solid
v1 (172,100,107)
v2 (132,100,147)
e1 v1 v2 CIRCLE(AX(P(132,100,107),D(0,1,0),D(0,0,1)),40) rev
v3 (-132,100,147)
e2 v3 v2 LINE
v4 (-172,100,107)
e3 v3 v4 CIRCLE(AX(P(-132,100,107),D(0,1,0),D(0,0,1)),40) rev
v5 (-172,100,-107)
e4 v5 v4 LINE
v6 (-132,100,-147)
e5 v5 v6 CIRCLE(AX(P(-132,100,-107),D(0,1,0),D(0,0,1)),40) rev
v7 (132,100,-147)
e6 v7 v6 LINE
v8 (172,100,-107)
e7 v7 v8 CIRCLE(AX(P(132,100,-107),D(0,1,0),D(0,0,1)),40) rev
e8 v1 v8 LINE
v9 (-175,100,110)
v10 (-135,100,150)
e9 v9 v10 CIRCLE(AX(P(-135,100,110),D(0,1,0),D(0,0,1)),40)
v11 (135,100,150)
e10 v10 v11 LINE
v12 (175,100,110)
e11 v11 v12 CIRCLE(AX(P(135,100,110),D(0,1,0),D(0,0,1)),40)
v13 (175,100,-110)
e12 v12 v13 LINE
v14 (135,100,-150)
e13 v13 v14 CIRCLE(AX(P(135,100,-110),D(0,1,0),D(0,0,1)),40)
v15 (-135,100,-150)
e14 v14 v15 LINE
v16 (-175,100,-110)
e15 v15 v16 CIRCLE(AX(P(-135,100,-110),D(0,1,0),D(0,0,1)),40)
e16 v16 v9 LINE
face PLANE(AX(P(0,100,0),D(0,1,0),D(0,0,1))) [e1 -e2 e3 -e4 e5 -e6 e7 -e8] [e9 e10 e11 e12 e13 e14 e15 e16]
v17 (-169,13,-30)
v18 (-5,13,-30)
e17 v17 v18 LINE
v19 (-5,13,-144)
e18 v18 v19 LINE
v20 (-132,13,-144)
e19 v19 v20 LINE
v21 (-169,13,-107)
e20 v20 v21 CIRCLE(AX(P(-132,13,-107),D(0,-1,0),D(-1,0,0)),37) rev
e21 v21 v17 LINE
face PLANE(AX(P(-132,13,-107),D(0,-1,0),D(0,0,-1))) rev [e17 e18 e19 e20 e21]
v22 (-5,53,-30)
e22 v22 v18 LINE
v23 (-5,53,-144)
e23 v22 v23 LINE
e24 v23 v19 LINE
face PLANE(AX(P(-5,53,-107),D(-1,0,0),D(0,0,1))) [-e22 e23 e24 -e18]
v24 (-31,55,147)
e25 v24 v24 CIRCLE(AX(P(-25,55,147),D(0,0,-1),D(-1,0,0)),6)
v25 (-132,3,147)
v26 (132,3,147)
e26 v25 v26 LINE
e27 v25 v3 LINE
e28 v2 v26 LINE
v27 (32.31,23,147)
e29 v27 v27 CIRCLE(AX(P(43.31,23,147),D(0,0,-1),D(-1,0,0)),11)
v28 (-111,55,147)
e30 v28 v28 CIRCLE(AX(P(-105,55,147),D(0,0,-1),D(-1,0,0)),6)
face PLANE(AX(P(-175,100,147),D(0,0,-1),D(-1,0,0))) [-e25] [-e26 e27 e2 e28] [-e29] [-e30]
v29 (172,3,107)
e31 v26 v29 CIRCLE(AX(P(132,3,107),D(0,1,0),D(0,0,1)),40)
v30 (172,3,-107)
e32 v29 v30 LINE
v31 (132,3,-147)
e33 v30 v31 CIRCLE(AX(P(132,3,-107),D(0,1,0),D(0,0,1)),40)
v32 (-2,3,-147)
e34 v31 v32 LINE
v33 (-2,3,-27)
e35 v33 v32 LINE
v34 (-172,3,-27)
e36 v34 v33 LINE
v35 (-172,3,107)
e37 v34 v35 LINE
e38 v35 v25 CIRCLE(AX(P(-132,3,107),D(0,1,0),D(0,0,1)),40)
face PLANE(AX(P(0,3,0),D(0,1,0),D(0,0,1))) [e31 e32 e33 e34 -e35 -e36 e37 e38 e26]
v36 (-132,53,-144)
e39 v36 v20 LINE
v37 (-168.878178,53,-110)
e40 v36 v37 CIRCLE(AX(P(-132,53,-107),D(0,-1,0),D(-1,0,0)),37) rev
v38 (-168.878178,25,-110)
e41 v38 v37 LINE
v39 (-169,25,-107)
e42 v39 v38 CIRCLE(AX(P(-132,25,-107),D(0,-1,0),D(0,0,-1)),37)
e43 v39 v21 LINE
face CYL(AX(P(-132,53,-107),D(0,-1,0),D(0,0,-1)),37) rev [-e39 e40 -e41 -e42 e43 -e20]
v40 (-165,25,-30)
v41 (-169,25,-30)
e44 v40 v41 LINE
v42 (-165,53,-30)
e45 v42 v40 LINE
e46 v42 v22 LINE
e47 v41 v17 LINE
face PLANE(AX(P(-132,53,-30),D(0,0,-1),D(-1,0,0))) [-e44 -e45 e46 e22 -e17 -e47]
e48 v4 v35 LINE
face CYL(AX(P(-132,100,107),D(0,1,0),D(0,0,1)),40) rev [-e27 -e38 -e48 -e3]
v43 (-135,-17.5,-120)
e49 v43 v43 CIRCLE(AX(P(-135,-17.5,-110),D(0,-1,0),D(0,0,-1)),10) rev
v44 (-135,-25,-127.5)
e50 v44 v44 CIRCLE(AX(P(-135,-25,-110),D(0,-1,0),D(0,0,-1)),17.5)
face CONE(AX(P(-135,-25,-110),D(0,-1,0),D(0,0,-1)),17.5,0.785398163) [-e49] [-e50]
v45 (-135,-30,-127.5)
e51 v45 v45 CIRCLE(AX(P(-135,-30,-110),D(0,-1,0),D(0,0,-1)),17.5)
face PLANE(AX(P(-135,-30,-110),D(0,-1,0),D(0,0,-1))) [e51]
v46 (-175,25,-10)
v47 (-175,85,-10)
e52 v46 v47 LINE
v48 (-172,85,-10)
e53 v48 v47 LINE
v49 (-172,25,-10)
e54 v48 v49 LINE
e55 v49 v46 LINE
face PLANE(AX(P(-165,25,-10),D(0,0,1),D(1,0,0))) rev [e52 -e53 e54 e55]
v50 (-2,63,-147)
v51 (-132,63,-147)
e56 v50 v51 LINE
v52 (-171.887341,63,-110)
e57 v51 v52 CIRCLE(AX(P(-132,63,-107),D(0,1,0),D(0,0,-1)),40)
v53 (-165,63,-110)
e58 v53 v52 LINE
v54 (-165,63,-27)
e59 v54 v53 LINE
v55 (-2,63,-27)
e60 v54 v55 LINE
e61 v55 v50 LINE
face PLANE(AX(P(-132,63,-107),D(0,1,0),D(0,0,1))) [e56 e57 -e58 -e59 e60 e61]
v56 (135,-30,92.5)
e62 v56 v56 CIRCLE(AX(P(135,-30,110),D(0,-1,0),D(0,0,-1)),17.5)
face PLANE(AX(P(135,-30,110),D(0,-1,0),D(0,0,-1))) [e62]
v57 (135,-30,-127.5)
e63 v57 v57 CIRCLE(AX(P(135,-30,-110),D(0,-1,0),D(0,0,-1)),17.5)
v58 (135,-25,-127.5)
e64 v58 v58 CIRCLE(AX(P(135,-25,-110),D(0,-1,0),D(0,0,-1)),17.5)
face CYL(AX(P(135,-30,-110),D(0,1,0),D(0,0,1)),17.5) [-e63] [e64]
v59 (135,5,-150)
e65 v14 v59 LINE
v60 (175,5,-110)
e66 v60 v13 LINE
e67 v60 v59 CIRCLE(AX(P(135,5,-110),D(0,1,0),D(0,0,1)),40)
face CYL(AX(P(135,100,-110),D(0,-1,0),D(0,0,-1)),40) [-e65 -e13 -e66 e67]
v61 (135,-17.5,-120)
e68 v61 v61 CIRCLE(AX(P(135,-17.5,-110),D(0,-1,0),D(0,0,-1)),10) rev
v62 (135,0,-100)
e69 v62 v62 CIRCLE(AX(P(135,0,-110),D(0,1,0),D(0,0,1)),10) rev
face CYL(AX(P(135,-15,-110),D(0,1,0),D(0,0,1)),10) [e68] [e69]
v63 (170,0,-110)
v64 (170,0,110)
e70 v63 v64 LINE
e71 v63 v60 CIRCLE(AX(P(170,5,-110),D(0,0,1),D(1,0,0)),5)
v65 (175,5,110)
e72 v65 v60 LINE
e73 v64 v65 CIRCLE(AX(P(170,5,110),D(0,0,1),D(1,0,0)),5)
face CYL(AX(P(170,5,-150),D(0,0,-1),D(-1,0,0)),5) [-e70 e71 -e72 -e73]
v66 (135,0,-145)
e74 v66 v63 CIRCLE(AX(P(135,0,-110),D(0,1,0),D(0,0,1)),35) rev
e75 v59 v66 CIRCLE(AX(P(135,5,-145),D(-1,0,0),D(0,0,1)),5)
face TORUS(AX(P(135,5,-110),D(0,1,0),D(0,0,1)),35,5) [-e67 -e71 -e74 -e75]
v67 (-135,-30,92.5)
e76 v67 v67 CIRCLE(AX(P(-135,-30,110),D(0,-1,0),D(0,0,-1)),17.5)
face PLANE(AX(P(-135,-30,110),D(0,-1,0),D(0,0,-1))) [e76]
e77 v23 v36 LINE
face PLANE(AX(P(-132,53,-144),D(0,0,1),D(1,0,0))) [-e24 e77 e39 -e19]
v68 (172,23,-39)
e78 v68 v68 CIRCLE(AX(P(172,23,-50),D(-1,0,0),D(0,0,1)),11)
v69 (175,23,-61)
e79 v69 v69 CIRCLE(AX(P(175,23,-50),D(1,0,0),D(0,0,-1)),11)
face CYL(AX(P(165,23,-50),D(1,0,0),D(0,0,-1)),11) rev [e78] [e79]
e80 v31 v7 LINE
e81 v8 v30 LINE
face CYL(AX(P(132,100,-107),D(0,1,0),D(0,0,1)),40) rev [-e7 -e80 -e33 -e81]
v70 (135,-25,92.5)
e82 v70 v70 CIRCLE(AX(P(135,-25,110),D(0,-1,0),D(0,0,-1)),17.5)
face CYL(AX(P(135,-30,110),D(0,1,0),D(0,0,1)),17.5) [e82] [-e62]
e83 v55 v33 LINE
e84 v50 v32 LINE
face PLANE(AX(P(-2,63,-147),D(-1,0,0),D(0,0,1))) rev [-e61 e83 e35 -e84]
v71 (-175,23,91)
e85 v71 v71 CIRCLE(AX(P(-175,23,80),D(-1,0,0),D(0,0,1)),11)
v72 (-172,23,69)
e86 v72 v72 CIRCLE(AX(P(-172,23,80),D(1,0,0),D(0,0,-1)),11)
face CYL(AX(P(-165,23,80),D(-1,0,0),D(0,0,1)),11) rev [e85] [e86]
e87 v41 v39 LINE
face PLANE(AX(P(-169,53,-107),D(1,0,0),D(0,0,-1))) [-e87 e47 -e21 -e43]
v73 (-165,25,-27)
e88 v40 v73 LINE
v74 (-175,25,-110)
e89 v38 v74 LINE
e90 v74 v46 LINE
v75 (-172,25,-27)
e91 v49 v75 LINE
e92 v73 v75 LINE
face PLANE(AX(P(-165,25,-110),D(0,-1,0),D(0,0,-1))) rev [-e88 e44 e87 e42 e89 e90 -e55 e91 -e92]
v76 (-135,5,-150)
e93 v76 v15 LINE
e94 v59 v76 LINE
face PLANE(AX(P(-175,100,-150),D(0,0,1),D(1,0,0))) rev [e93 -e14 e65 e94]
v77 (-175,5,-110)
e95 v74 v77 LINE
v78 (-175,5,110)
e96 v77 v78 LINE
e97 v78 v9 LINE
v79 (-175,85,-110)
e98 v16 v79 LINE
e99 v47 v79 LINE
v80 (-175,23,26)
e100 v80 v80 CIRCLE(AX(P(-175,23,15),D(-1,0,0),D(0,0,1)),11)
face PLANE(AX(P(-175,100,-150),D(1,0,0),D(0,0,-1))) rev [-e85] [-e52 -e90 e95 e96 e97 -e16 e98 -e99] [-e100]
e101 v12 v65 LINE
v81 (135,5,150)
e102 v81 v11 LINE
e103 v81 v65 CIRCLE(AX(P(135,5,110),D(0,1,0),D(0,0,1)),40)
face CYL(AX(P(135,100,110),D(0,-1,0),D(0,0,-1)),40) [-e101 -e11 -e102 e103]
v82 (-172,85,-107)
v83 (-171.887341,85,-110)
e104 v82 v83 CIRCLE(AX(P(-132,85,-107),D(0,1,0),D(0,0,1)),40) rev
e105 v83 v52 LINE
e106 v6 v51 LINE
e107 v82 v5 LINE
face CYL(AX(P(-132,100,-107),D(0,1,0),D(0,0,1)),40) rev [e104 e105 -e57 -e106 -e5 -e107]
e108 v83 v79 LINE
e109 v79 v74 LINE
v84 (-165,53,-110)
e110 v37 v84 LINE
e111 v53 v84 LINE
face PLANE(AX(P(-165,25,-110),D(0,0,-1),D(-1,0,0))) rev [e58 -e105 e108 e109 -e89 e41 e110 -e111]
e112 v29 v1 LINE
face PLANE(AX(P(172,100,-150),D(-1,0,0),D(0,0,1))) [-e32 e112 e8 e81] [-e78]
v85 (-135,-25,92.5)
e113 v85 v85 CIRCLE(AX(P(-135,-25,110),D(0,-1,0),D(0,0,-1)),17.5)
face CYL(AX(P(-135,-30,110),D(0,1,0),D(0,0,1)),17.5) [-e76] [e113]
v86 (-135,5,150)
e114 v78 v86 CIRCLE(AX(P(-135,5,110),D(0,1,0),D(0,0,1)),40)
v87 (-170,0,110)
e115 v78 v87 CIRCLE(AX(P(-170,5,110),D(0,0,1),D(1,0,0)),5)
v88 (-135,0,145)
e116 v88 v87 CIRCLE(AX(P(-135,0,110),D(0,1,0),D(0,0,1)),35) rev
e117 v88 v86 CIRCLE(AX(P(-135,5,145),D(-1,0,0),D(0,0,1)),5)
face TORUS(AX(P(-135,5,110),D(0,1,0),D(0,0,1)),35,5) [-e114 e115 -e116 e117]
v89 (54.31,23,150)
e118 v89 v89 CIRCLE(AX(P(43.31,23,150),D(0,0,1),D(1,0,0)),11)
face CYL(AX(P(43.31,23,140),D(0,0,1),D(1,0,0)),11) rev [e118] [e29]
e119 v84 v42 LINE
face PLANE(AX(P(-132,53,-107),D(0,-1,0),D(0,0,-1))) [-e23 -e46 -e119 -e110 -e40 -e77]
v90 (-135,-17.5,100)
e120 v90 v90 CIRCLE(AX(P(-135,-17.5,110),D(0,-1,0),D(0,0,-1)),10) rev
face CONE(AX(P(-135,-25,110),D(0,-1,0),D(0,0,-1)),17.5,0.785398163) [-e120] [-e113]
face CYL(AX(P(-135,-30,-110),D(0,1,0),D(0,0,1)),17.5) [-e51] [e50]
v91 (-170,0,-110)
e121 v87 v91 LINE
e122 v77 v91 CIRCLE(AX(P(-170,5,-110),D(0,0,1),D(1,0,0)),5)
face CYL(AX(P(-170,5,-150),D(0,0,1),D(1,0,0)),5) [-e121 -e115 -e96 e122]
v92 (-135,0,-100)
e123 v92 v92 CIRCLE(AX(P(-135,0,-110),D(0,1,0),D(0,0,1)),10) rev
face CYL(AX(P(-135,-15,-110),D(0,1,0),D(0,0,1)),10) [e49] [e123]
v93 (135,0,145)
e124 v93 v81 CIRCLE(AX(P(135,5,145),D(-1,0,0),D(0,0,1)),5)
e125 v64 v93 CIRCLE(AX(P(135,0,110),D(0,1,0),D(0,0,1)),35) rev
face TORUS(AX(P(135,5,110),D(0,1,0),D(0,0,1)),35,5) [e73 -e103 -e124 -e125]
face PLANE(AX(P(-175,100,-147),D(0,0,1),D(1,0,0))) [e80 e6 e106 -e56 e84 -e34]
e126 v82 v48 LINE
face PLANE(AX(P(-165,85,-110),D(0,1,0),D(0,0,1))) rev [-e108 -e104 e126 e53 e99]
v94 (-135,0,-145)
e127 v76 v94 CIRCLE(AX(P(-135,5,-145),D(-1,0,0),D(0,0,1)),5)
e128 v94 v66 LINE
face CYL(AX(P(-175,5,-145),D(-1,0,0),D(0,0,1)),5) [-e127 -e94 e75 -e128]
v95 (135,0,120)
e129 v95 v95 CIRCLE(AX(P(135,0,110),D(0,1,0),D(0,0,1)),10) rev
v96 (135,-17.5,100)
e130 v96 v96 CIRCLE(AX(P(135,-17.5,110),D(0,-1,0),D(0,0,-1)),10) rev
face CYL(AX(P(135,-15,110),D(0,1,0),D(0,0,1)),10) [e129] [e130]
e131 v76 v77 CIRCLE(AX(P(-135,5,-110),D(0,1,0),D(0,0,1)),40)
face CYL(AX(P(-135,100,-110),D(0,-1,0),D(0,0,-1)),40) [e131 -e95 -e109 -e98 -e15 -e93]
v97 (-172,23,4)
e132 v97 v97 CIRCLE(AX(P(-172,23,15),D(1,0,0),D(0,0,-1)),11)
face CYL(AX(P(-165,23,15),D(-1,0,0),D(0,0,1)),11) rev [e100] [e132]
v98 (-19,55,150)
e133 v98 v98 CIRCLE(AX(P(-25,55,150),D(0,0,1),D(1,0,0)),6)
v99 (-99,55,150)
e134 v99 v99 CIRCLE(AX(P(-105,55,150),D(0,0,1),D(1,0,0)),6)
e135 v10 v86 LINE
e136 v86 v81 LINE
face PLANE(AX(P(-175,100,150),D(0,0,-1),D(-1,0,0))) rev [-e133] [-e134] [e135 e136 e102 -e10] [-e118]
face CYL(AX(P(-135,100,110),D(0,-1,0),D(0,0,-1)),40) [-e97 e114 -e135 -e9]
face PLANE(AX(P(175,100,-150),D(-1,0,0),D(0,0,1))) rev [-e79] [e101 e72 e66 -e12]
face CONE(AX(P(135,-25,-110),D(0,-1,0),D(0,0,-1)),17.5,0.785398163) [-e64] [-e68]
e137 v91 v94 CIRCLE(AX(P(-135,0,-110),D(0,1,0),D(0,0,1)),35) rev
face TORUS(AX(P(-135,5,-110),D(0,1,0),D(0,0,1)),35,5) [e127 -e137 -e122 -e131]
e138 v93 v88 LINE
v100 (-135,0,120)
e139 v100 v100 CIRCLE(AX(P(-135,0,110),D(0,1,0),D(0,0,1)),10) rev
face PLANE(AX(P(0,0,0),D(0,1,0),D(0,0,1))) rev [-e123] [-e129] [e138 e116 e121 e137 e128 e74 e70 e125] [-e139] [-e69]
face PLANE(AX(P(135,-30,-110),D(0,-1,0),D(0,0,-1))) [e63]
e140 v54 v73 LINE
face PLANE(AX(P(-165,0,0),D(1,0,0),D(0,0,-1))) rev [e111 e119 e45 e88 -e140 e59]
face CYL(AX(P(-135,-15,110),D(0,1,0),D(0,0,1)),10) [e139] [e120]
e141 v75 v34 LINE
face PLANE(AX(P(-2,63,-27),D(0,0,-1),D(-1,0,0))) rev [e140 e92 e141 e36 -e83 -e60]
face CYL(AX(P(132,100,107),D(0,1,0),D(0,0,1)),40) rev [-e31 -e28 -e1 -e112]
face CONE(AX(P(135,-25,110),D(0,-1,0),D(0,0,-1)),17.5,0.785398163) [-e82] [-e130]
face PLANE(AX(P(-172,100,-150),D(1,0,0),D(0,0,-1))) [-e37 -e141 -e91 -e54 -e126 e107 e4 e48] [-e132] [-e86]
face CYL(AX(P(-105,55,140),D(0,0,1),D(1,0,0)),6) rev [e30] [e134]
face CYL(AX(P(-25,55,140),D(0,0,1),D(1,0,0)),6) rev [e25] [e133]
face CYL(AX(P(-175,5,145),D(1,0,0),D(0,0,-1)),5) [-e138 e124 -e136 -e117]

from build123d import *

# Parameters (mm, degrees)
SKETCH1_W             = 350
SKETCH1_H             = 300
BOSS_EXTRUDE1_DEPTH   = 100
SHELL1_T              = -3
SKETCH2_R             = 11
CUT_EXTRUDE1_DEPTH    = 10
SKETCH3_R             = 11
CUT_EXTRUDE2_DEPTH    = 10
SKETCH4_R             = 11
CUT_EXTRUDE3_DEPTH    = 10
FILLET1_R             = 40
FILLET2_R             = 5
SKETCH5_R             = 10
BOSS_EXTRUDE2_DEPTH   = 15
SKETCH6_R             = 17.5
BOSS_EXTRUDE3_DEPTH   = 15
CHAMFER1_SIZE         = 10
EXTRUDE_THIN1_DEPTH   = 10
EXTRUDE_THIN1_START   = 50
EXTRUDE_THIN1_2_DEPTH = 10
EXTRUDE_THIN1_START_2 = 10
EXTRUDE_THIN1_3_DEPTH = 40
SKETCH8_W             = 100
SKETCH8_H             = 60
CUT_EXTRUDE4_DEPTH    = 10
SKETCH9_R             = 6
CUT_EXTRUDE5_DEPTH    = 10


# Read off the part's stored shape, not the designer's step: Extrude-Thin1
with BuildPart() as part:
    # Sketch1 → Boss-Extrude1 (new body)
    with BuildSketch(Plane(origin=(0, 0, 0), x_dir=(1, 0, 0), z_dir=(0, 1, 0))):
        Rectangle(SKETCH1_W, SKETCH1_H)
    extrude(amount=BOSS_EXTRUDE1_DEPTH)

    # Shell1
    shell1_openings = [part.faces().sort_by_distance(p)[0] for p in [
        (0, 100, 0),
    ]]
    offset(amount=SHELL1_T, openings=shell1_openings, kind=Kind.INTERSECTION)

    # Sketch2 → Cut-Extrude1 (cut)
    with BuildSketch(Plane.ZY.offset(175)):
        with Locations((80, 23)):
            Circle(SKETCH2_R)
        with Locations((15, 23)):
            Circle(SKETCH2_R)
    extrude(amount=-CUT_EXTRUDE1_DEPTH, mode=Mode.SUBTRACT)

    # Sketch3 → Cut-Extrude2 (cut)
    with BuildSketch(Plane.XY.offset(150)):
        with Locations((43.31, 23)):
            Circle(SKETCH3_R)
    extrude(amount=-CUT_EXTRUDE2_DEPTH, mode=Mode.SUBTRACT)

    # Sketch4 → Cut-Extrude3 (cut)
    with BuildSketch(Plane(origin=(175, 0, 0), x_dir=(0, 0, -1), z_dir=(1, 0, 0))):
        with Locations((50, 23)):
            Circle(SKETCH4_R)
    extrude(amount=-CUT_EXTRUDE3_DEPTH, mode=Mode.SUBTRACT)

    # Fillet1
    fillet1_edges = [part.edges().sort_by_distance(p)[0] for p in [
        (172, 51.5, 147),
        (172, 51.5, -147),
        (-172, 51.5, -147),
        (-172, 51.5, 147),
        (175, 50, 150),
        (-175, 50, 150),
        (-175, 50, -150),
        (175, 50, -150),
    ]]
    fillet(fillet1_edges, radius=FILLET1_R)

    # Fillet2
    fillet2_edges = [part.edges().sort_by_distance(p)[0] for p in [
        (0, 0, -150),
        (175, 0, 0),
        (0, 0, 150),
        (-175, 0, 0),
        (-163.284271247, 0, 138.284271247),
        (163.284271247, 0, 138.284271247),
        (-163.284271247, 0, -138.284271247),
        (163.284271247, 0, -138.284271247),
    ]]
    fillet(fillet2_edges, radius=FILLET2_R)

    # Sketch5 → Boss-Extrude2 (add)
    with BuildSketch(Plane.XZ):
        with Locations(Location((-135, -110, 0), (0, 0, 90))):
            Circle(SKETCH5_R)
        with Locations(Location((-135, 110, 0), (0, 0, 90))):
            Circle(SKETCH5_R)
        with Locations(Location((135, -110, 0), (0, 0, 90))):
            Circle(SKETCH5_R)
        with Locations(Location((135, 110, 0), (0, 0, 90))):
            Circle(SKETCH5_R)
    extrude(amount=BOSS_EXTRUDE2_DEPTH)

    # Sketch6 → Boss-Extrude3 (add)
    with BuildSketch(Plane.XZ.offset(15)):
        with Locations(Location((135, 110, 0), (0, 0, 270))):
            Circle(SKETCH6_R)
        with Locations(Location((135, -110, 0), (0, 0, 270))):
            Circle(SKETCH6_R)
        with Locations(Location((-135, 110, 0), (0, 0, 270))):
            Circle(SKETCH6_R)
        with Locations(Location((-135, -110, 0), (0, 0, 270))):
            Circle(SKETCH6_R)
    extrude(amount=BOSS_EXTRUDE3_DEPTH)

    # Chamfer1
    # the kernel refuses this chamfer: 10 mm, written as the material it takes off along each edge
    with BuildSketch(Plane(origin=(-135, -15, -110), x_dir=(0, 0, -1), z_dir=(-1, 0, 0))) as chamfer1_piece_1_section:
        Polygon((17.5 - CHAMFER1_SIZE, 0), (17.5, CHAMFER1_SIZE), (17.5, 0), align=None)
    chamfer1_piece_1 = revolve(axis=Axis((-135, -15, -110), (0, -1, 0)), mode=Mode.PRIVATE)
    chamfer1_piece_1 = chamfer1_piece_1 - Plane(origin=(-135, -21.273186291, -110), x_dir=(0, 0, 1), z_dir=(0, 1, 0)) * Cylinder(10, 70, mode=Mode.PRIVATE)
    add(chamfer1_piece_1, mode=Mode.SUBTRACT)
    with BuildSketch(Plane(origin=(-135, -15, 110), x_dir=(0, 0, -1), z_dir=(-1, 0, 0))) as chamfer1_piece_2_section:
        Polygon((17.5 - CHAMFER1_SIZE, 0), (17.5, CHAMFER1_SIZE), (17.5, 0), align=None)
    chamfer1_piece_2 = revolve(axis=Axis((-135, -15, 110), (0, -1, 0)), mode=Mode.PRIVATE)
    chamfer1_piece_2 = chamfer1_piece_2 - Plane(origin=(-135, -21.273186291, 110), x_dir=(0, 0, 1), z_dir=(0, 1, 0)) * Cylinder(10, 70, mode=Mode.PRIVATE)
    add(chamfer1_piece_2, mode=Mode.SUBTRACT)
    with BuildSketch(Plane(origin=(135, -15, -110), x_dir=(0, 0, -1), z_dir=(-1, 0, 0))) as chamfer1_piece_3_section:
        Polygon((17.5 - CHAMFER1_SIZE, 0), (17.5, CHAMFER1_SIZE), (17.5, 0), align=None)
    chamfer1_piece_3 = revolve(axis=Axis((135, -15, -110), (0, -1, 0)), mode=Mode.PRIVATE)
    chamfer1_piece_3 = chamfer1_piece_3 - Plane(origin=(135, -21.273186291, -110), x_dir=(0, 0, 1), z_dir=(0, 1, 0)) * Cylinder(10, 71, mode=Mode.PRIVATE)
    add(chamfer1_piece_3, mode=Mode.SUBTRACT)
    with BuildSketch(Plane(origin=(135, -15, 110), x_dir=(0, 0, -1), z_dir=(-1, 0, 0))) as chamfer1_piece_4_section:
        Polygon((17.5, CHAMFER1_SIZE), (17.5 - CHAMFER1_SIZE, 0), (17.5, 0), align=None)
    chamfer1_piece_4 = revolve(axis=Axis((135, -15, 110), (0, -1, 0)), mode=Mode.PRIVATE)
    chamfer1_piece_4 = chamfer1_piece_4 - Plane(origin=(135, -21.273186291, 110), x_dir=(0, 0, 1), z_dir=(0, 1, 0)) * Cylinder(10, 71, mode=Mode.PRIVATE)
    add(chamfer1_piece_4, mode=Mode.SUBTRACT)

    # Extrude-Thin1 outline → Extrude-Thin1 (add)
    with BuildSketch(Plane(origin=(0, 3, 0), x_dir=(1, 0, 0), z_dir=(0, 1, 0))):
        with BuildLine():
            Line((-172, 27), (-2, 27))
            Line((-2, 27), (-2, 147))
            Line((-2, 147), (-132, 147))
            ThreePointArc((-132, 147), (-160.284271247, 135.284271247), (-172, 107))
            Line((-172, 107), (-172, 27))
        make_face()
    extrude(amount=EXTRUDE_THIN1_DEPTH)

    # Extrude-Thin1 2 outline → Extrude-Thin1 2 (add)
    with BuildSketch(Plane(origin=(0, 3, 0), x_dir=(1, 0, 0), z_dir=(0, 1, 0)).offset(EXTRUDE_THIN1_START)):
        with BuildLine():
            Line((-172, 27), (-2, 27))
            Line((-2, 27), (-2, 147))
            Line((-2, 147), (-132, 147))
            ThreePointArc((-132, 147), (-160.284271247, 135.284271247), (-172, 107))
            Line((-172, 107), (-172, 27))
        make_face()
    extrude(amount=EXTRUDE_THIN1_2_DEPTH)

    # Extrude-Thin1 3 outline → Extrude-Thin1 3 (add)
    with BuildSketch(Plane(origin=(0, 3, 0), x_dir=(1, 0, 0), z_dir=(0, 1, 0)).offset(EXTRUDE_THIN1_START_2)):
        with BuildLine():
            Line((-172, 27), (-2, 27))
            Line((-2, 27), (-2, 147))
            Line((-2, 147), (-132, 147))
            ThreePointArc((-132, 147), (-160.284271247, 135.284271247), (-172, 107))
            Line((-172, 107), (-172, 27))
        make_face()
        with BuildLine():
            ThreePointArc((-169, 107), (-158.162950904, 133.162950904), (-132, 144))
            Line((-132, 144), (-5, 144))
            Line((-5, 144), (-5, 30))
            Line((-5, 30), (-169, 30))
            Line((-169, 30), (-169, 107))
        make_face(mode=Mode.SUBTRACT)
    extrude(amount=EXTRUDE_THIN1_3_DEPTH)

    # Sketch8 → Cut-Extrude4 (cut)
    with BuildSketch(Plane.ZY.offset(175)):
        with Locations((-60, 55)):
            Rectangle(SKETCH8_W, SKETCH8_H)
    extrude(amount=-CUT_EXTRUDE4_DEPTH, mode=Mode.SUBTRACT)

    # Sketch9 → Cut-Extrude5 (cut)
    with BuildSketch(Plane.XY.offset(150)):
        with Locations((-105, 55)):
            Circle(SKETCH9_R)
        with Locations((-25, 55)):
            Circle(SKETCH9_R)
    extrude(amount=-CUT_EXTRUDE5_DEPTH, mode=Mode.SUBTRACT)


solid = part.part
